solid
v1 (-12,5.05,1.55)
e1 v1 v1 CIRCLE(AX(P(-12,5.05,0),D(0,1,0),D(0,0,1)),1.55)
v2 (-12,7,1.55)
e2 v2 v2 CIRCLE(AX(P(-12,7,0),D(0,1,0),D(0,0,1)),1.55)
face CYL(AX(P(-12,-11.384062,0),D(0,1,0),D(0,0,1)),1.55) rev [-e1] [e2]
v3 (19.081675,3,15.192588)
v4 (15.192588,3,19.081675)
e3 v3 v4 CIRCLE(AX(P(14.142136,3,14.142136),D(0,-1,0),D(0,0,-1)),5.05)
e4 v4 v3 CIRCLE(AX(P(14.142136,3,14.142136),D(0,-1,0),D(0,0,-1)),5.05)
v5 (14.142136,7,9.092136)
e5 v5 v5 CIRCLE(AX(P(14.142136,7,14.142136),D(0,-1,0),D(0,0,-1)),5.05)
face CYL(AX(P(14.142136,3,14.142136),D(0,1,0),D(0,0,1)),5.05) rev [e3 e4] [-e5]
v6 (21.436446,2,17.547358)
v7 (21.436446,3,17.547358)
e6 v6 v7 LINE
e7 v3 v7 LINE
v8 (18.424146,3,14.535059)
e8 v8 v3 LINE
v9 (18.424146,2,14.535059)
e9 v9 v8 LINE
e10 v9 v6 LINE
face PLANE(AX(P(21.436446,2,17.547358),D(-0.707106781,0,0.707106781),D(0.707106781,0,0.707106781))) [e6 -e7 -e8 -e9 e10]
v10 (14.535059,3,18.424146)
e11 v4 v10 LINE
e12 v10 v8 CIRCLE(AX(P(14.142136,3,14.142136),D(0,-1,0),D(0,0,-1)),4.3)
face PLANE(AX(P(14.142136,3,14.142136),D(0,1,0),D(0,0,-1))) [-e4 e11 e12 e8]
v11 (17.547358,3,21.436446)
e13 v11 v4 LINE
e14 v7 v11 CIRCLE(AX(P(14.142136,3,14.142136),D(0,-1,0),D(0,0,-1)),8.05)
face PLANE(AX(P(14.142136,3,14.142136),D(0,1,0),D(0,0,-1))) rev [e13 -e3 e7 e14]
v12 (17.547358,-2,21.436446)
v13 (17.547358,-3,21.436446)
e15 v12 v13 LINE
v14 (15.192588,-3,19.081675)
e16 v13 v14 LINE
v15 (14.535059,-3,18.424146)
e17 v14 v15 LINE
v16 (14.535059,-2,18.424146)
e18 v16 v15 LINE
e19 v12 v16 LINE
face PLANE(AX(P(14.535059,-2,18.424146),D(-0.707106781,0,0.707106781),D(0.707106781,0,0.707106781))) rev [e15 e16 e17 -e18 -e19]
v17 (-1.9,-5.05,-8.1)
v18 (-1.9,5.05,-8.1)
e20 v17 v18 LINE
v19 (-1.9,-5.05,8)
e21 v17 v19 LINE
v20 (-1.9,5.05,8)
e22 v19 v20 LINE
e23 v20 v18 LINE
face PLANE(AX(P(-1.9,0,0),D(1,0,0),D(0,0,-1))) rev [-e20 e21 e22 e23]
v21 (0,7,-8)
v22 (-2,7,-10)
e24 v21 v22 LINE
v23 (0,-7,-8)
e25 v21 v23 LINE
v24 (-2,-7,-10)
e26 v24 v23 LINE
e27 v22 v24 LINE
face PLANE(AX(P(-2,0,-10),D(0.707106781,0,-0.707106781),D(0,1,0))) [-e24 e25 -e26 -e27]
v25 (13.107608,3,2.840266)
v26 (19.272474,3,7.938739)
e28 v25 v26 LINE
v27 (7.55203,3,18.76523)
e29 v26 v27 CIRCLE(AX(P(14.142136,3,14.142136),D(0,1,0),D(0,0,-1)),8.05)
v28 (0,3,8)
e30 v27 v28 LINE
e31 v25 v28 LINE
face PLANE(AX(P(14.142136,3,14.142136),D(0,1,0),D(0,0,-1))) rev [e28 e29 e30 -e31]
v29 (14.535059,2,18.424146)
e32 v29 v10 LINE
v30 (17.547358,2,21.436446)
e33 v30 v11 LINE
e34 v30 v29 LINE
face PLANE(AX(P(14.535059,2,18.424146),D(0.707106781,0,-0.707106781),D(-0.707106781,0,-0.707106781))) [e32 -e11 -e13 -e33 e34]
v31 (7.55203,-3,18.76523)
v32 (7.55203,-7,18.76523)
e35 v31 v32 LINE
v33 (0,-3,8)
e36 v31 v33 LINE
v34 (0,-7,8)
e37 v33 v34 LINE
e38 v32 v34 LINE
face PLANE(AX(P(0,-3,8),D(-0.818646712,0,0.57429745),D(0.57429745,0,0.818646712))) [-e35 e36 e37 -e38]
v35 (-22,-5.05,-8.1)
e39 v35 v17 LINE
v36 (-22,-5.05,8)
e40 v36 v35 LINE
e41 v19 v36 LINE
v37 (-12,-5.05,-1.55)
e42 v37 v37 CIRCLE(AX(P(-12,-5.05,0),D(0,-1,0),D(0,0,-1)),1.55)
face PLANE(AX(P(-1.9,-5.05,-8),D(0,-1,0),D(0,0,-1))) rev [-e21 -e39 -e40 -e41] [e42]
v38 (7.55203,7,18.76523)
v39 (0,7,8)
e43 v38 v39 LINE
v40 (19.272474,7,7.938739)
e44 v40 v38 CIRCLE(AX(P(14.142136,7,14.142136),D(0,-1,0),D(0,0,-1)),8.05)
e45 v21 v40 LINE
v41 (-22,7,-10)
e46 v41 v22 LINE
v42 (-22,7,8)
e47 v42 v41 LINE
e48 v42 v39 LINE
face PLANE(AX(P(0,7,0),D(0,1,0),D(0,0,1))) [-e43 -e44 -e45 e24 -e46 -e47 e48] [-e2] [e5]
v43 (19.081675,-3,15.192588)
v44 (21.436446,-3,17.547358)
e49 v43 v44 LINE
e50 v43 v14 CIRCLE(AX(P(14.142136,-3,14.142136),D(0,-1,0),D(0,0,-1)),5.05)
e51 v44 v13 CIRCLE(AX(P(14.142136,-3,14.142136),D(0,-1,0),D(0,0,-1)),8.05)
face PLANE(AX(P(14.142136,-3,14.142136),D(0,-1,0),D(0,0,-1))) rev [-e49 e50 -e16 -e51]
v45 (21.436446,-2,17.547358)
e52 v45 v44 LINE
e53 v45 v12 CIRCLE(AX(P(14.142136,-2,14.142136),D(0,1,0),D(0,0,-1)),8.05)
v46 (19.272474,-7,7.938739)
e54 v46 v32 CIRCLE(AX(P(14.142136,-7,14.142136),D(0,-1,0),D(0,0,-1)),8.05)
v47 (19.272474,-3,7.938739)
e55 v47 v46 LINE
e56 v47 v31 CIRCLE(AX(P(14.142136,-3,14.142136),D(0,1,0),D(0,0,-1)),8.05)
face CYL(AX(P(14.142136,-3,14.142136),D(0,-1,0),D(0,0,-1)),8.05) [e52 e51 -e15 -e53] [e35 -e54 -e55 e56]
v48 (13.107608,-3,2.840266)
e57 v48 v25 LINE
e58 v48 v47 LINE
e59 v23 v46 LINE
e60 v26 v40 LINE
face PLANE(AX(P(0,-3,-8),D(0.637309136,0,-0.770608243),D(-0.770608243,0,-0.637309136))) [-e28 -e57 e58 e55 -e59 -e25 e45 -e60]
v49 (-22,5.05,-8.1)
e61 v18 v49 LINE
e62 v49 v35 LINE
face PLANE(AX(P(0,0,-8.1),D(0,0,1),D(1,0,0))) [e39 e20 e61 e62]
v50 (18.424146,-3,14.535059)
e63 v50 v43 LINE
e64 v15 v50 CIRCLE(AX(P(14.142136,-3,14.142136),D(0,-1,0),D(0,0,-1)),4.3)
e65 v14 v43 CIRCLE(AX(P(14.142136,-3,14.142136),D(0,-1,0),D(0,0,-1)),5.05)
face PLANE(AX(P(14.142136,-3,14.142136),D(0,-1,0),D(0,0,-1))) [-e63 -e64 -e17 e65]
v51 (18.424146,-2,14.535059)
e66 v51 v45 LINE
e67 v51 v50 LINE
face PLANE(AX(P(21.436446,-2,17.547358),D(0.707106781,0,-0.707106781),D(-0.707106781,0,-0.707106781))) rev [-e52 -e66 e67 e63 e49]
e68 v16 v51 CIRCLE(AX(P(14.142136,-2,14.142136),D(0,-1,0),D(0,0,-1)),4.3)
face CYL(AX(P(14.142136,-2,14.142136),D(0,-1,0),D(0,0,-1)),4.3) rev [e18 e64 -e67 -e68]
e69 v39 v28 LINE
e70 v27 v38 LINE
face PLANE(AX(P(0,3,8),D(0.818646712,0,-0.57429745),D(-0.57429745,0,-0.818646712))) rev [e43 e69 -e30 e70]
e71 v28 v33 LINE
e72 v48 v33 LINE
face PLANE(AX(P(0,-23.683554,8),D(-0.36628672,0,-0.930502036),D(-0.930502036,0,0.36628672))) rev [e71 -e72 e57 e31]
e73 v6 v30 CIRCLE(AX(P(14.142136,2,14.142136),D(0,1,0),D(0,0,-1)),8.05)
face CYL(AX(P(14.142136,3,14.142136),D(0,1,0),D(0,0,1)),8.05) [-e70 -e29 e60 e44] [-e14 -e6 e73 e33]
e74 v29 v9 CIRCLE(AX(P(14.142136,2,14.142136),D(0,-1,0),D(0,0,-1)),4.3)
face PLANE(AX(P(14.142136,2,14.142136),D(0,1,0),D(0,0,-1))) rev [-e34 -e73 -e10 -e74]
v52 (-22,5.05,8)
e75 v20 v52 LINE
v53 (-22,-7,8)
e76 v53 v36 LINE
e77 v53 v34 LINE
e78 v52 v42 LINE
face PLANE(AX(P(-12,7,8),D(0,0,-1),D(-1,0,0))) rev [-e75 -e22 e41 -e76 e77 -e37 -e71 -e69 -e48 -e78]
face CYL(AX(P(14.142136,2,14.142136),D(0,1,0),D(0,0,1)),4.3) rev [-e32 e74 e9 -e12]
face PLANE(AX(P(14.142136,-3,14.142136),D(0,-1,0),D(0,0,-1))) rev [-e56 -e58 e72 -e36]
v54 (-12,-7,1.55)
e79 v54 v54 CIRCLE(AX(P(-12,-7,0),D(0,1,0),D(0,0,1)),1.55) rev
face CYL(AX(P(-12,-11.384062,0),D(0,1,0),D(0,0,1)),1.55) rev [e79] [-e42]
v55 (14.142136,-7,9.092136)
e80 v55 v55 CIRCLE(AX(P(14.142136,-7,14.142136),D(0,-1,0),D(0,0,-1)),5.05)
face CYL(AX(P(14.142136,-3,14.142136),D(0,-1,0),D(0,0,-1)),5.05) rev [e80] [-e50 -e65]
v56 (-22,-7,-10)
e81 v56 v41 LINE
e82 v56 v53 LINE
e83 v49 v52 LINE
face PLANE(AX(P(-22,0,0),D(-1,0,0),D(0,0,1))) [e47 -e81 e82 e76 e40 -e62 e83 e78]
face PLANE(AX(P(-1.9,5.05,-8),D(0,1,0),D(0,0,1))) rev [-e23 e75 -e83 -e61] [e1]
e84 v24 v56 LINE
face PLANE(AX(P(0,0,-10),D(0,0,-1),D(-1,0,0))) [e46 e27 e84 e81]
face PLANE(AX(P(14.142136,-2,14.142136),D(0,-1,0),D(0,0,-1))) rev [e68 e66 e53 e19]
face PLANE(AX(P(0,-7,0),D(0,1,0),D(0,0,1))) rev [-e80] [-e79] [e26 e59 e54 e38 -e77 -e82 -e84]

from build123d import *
from build123d.topology import SkipClean

# Parameters (mm, degrees)
SKETCH1_W           = 12
SKETCH1_H           = 16
BOSS_EXTRUDE1_DEPTH = 7
SKETCH4_W           = 16
SKETCH4_H           = 10.1
CUT_EXTRUDE1_DEPTH  = 10.1
SKETCH5_R           = 5.05
BOSS_EXTRUDE2_DEPTH = 4
BOSS_EXTRUDE3_DEPTH = 1
BOSS_EXTRUDE5_DEPTH = 6
SKETCH9_W           = 16
SKETCH9_H           = 1.95
BOSS_EXTRUDE6_DEPTH = 10
SKETCH10_W          = 22
SKETCH10_H          = 14
BOSS_EXTRUDE7_DEPTH = 2
CUT_EXTRUDE2_START  = -14
SKETCH7_R           = 1.55
CUT_EXTRUDE2_DEPTH  = 14
CHAMFER1_SIZE       = 2
SKETCH11_W          = 20.1
SKETCH11_H          = 10.1
CUT_EXTRUDE3_DEPTH  = 0.1


with BuildPart() as part:
    # Sketch1 → Boss-Extrude1 (new, symmetric)
    with BuildSketch(Plane(origin=(0, 0, 0), x_dir=(1, 0, 0), z_dir=(0, 1, 0))):
        with Locations((-6, 0)):
            Rectangle(SKETCH1_W, SKETCH1_H)
    extrude(amount=BOSS_EXTRUDE1_DEPTH, both=True)

    # Sketch4 → Cut-Extrude1 (cut)
    with BuildSketch(Plane.ZY.offset(12)):
        Rectangle(SKETCH4_W, SKETCH4_H)
    extrude(amount=-CUT_EXTRUDE1_DEPTH, mode=Mode.SUBTRACT)

    # Sketch5 → Boss-Extrude2 (add)
    with BuildSketch(Plane.XZ.offset(7)):
        with BuildLine():
            Line((0, 8), (7.55203, 18.76523))
            ThreePointArc((7.55203, 18.76523), (19.604366, 20.055387), (19.272474, 7.938739))
            Line((19.272474, 7.938739), (0, -8))
            Line((0, -8), (0, 8))
        make_face()
        with Locations(Location((14.142136, 14.142136, 0), (0, 0, 270))):
            Circle(SKETCH5_R, mode=Mode.SUBTRACT)
    boss_extrude2 = extrude(amount=-BOSS_EXTRUDE2_DEPTH)

    # Mirror1: Boss-Extrude2 across plane
    add(boss_extrude2.mirror(Plane(origin=(0, 0, 0), x_dir=(0, 0, 1), z_dir=(0, -1, 0))))

    # Sketch6 → Boss-Extrude3 (add)
    with SkipClean():  # the faces are left unmerged after this step: merging them gives an invalid solid
        with BuildSketch(Plane(origin=(0, -3, 0), x_dir=(1, 0, 0), z_dir=(0, 1, 0))):
            with BuildLine():
                Line((14.535059, -18.424146), (17.547358, -21.436446))
                ThreePointArc((17.547358, -21.436446), (8.449926, -8.449926), (21.436446, -17.547358))
                Line((21.436446, -17.547358), (18.424146, -14.535059))
                ThreePointArc((18.424146, -14.535059), (11.101576, -11.101576), (14.535059, -18.424146))
            make_face()
        boss_extrude3 = extrude(amount=BOSS_EXTRUDE3_DEPTH)

    # Mirror2: Boss-Extrude3 across plane
    with SkipClean():  # the faces are left unmerged after this step: merging them gives an invalid solid
        add(boss_extrude3.mirror(Plane(origin=(0, 0, 0), x_dir=(0, 0, 1), z_dir=(0, -1, 0))))

    # Sketch8 → Boss-Extrude5 (add)
    with SkipClean():  # the faces are left unmerged after this step: merging them gives an invalid solid
        with BuildSketch(Plane.XZ.offset(-3)):
            Polygon((13.107608, 2.840266), (0, -8), (0, 8), align=None)
        extrude(amount=BOSS_EXTRUDE5_DEPTH)

    # Sketch9 → Boss-Extrude6 (add)
    with SkipClean():  # the faces are left unmerged after this step: merging them gives an invalid solid
        with BuildSketch(Plane.ZY.offset(12)):
            with Locations((0, 6.025)):
                Rectangle(SKETCH9_W, SKETCH9_H)
            with Locations((0, -6.025)):
                Rectangle(SKETCH9_W, SKETCH9_H)
        extrude(amount=BOSS_EXTRUDE6_DEPTH)

    # Sketch10 → Boss-Extrude7 (add)
    with SkipClean():  # the faces are left unmerged after this step: merging them gives an invalid solid
        with BuildSketch(Plane(origin=(0, 0, -8), x_dir=(-1, 0, 0), z_dir=(0, 0, -1))):
            with Locations((11, 0)):
                Rectangle(SKETCH10_W, SKETCH10_H)
        extrude(amount=BOSS_EXTRUDE7_DEPTH)

    # Sketch7 → Cut-Extrude2 (cut)
    with SkipClean():  # the faces are left unmerged after this step: merging them gives an invalid solid
        with BuildSketch(Plane(origin=(0, 7, 0), x_dir=(1, 0, 0), z_dir=(0, 1, 0)).offset(CUT_EXTRUDE2_START)):
            with Locations(Location((-12, 0, 0), (0, 0, 270))):
                Circle(SKETCH7_R)
        extrude(amount=CUT_EXTRUDE2_DEPTH, mode=Mode.SUBTRACT)

    # Chamfer1
    chamfer1_edges = [part.edges().sort_by_distance(p)[0] for p in [
        (0, 0, -10),
    ]]
    chamfer(chamfer1_edges, length=CHAMFER1_SIZE - 0.0001)  # a hair under: the kernel refuses the full size

    # Sketch11 → Cut-Extrude3 (cut)
    with BuildSketch(Plane.XY.offset(-8)):
        with Locations((-11.95, 0)):
            Rectangle(SKETCH11_W, SKETCH11_H)
    extrude(amount=-CUT_EXTRUDE3_DEPTH, mode=Mode.SUBTRACT)


solid = part.part
